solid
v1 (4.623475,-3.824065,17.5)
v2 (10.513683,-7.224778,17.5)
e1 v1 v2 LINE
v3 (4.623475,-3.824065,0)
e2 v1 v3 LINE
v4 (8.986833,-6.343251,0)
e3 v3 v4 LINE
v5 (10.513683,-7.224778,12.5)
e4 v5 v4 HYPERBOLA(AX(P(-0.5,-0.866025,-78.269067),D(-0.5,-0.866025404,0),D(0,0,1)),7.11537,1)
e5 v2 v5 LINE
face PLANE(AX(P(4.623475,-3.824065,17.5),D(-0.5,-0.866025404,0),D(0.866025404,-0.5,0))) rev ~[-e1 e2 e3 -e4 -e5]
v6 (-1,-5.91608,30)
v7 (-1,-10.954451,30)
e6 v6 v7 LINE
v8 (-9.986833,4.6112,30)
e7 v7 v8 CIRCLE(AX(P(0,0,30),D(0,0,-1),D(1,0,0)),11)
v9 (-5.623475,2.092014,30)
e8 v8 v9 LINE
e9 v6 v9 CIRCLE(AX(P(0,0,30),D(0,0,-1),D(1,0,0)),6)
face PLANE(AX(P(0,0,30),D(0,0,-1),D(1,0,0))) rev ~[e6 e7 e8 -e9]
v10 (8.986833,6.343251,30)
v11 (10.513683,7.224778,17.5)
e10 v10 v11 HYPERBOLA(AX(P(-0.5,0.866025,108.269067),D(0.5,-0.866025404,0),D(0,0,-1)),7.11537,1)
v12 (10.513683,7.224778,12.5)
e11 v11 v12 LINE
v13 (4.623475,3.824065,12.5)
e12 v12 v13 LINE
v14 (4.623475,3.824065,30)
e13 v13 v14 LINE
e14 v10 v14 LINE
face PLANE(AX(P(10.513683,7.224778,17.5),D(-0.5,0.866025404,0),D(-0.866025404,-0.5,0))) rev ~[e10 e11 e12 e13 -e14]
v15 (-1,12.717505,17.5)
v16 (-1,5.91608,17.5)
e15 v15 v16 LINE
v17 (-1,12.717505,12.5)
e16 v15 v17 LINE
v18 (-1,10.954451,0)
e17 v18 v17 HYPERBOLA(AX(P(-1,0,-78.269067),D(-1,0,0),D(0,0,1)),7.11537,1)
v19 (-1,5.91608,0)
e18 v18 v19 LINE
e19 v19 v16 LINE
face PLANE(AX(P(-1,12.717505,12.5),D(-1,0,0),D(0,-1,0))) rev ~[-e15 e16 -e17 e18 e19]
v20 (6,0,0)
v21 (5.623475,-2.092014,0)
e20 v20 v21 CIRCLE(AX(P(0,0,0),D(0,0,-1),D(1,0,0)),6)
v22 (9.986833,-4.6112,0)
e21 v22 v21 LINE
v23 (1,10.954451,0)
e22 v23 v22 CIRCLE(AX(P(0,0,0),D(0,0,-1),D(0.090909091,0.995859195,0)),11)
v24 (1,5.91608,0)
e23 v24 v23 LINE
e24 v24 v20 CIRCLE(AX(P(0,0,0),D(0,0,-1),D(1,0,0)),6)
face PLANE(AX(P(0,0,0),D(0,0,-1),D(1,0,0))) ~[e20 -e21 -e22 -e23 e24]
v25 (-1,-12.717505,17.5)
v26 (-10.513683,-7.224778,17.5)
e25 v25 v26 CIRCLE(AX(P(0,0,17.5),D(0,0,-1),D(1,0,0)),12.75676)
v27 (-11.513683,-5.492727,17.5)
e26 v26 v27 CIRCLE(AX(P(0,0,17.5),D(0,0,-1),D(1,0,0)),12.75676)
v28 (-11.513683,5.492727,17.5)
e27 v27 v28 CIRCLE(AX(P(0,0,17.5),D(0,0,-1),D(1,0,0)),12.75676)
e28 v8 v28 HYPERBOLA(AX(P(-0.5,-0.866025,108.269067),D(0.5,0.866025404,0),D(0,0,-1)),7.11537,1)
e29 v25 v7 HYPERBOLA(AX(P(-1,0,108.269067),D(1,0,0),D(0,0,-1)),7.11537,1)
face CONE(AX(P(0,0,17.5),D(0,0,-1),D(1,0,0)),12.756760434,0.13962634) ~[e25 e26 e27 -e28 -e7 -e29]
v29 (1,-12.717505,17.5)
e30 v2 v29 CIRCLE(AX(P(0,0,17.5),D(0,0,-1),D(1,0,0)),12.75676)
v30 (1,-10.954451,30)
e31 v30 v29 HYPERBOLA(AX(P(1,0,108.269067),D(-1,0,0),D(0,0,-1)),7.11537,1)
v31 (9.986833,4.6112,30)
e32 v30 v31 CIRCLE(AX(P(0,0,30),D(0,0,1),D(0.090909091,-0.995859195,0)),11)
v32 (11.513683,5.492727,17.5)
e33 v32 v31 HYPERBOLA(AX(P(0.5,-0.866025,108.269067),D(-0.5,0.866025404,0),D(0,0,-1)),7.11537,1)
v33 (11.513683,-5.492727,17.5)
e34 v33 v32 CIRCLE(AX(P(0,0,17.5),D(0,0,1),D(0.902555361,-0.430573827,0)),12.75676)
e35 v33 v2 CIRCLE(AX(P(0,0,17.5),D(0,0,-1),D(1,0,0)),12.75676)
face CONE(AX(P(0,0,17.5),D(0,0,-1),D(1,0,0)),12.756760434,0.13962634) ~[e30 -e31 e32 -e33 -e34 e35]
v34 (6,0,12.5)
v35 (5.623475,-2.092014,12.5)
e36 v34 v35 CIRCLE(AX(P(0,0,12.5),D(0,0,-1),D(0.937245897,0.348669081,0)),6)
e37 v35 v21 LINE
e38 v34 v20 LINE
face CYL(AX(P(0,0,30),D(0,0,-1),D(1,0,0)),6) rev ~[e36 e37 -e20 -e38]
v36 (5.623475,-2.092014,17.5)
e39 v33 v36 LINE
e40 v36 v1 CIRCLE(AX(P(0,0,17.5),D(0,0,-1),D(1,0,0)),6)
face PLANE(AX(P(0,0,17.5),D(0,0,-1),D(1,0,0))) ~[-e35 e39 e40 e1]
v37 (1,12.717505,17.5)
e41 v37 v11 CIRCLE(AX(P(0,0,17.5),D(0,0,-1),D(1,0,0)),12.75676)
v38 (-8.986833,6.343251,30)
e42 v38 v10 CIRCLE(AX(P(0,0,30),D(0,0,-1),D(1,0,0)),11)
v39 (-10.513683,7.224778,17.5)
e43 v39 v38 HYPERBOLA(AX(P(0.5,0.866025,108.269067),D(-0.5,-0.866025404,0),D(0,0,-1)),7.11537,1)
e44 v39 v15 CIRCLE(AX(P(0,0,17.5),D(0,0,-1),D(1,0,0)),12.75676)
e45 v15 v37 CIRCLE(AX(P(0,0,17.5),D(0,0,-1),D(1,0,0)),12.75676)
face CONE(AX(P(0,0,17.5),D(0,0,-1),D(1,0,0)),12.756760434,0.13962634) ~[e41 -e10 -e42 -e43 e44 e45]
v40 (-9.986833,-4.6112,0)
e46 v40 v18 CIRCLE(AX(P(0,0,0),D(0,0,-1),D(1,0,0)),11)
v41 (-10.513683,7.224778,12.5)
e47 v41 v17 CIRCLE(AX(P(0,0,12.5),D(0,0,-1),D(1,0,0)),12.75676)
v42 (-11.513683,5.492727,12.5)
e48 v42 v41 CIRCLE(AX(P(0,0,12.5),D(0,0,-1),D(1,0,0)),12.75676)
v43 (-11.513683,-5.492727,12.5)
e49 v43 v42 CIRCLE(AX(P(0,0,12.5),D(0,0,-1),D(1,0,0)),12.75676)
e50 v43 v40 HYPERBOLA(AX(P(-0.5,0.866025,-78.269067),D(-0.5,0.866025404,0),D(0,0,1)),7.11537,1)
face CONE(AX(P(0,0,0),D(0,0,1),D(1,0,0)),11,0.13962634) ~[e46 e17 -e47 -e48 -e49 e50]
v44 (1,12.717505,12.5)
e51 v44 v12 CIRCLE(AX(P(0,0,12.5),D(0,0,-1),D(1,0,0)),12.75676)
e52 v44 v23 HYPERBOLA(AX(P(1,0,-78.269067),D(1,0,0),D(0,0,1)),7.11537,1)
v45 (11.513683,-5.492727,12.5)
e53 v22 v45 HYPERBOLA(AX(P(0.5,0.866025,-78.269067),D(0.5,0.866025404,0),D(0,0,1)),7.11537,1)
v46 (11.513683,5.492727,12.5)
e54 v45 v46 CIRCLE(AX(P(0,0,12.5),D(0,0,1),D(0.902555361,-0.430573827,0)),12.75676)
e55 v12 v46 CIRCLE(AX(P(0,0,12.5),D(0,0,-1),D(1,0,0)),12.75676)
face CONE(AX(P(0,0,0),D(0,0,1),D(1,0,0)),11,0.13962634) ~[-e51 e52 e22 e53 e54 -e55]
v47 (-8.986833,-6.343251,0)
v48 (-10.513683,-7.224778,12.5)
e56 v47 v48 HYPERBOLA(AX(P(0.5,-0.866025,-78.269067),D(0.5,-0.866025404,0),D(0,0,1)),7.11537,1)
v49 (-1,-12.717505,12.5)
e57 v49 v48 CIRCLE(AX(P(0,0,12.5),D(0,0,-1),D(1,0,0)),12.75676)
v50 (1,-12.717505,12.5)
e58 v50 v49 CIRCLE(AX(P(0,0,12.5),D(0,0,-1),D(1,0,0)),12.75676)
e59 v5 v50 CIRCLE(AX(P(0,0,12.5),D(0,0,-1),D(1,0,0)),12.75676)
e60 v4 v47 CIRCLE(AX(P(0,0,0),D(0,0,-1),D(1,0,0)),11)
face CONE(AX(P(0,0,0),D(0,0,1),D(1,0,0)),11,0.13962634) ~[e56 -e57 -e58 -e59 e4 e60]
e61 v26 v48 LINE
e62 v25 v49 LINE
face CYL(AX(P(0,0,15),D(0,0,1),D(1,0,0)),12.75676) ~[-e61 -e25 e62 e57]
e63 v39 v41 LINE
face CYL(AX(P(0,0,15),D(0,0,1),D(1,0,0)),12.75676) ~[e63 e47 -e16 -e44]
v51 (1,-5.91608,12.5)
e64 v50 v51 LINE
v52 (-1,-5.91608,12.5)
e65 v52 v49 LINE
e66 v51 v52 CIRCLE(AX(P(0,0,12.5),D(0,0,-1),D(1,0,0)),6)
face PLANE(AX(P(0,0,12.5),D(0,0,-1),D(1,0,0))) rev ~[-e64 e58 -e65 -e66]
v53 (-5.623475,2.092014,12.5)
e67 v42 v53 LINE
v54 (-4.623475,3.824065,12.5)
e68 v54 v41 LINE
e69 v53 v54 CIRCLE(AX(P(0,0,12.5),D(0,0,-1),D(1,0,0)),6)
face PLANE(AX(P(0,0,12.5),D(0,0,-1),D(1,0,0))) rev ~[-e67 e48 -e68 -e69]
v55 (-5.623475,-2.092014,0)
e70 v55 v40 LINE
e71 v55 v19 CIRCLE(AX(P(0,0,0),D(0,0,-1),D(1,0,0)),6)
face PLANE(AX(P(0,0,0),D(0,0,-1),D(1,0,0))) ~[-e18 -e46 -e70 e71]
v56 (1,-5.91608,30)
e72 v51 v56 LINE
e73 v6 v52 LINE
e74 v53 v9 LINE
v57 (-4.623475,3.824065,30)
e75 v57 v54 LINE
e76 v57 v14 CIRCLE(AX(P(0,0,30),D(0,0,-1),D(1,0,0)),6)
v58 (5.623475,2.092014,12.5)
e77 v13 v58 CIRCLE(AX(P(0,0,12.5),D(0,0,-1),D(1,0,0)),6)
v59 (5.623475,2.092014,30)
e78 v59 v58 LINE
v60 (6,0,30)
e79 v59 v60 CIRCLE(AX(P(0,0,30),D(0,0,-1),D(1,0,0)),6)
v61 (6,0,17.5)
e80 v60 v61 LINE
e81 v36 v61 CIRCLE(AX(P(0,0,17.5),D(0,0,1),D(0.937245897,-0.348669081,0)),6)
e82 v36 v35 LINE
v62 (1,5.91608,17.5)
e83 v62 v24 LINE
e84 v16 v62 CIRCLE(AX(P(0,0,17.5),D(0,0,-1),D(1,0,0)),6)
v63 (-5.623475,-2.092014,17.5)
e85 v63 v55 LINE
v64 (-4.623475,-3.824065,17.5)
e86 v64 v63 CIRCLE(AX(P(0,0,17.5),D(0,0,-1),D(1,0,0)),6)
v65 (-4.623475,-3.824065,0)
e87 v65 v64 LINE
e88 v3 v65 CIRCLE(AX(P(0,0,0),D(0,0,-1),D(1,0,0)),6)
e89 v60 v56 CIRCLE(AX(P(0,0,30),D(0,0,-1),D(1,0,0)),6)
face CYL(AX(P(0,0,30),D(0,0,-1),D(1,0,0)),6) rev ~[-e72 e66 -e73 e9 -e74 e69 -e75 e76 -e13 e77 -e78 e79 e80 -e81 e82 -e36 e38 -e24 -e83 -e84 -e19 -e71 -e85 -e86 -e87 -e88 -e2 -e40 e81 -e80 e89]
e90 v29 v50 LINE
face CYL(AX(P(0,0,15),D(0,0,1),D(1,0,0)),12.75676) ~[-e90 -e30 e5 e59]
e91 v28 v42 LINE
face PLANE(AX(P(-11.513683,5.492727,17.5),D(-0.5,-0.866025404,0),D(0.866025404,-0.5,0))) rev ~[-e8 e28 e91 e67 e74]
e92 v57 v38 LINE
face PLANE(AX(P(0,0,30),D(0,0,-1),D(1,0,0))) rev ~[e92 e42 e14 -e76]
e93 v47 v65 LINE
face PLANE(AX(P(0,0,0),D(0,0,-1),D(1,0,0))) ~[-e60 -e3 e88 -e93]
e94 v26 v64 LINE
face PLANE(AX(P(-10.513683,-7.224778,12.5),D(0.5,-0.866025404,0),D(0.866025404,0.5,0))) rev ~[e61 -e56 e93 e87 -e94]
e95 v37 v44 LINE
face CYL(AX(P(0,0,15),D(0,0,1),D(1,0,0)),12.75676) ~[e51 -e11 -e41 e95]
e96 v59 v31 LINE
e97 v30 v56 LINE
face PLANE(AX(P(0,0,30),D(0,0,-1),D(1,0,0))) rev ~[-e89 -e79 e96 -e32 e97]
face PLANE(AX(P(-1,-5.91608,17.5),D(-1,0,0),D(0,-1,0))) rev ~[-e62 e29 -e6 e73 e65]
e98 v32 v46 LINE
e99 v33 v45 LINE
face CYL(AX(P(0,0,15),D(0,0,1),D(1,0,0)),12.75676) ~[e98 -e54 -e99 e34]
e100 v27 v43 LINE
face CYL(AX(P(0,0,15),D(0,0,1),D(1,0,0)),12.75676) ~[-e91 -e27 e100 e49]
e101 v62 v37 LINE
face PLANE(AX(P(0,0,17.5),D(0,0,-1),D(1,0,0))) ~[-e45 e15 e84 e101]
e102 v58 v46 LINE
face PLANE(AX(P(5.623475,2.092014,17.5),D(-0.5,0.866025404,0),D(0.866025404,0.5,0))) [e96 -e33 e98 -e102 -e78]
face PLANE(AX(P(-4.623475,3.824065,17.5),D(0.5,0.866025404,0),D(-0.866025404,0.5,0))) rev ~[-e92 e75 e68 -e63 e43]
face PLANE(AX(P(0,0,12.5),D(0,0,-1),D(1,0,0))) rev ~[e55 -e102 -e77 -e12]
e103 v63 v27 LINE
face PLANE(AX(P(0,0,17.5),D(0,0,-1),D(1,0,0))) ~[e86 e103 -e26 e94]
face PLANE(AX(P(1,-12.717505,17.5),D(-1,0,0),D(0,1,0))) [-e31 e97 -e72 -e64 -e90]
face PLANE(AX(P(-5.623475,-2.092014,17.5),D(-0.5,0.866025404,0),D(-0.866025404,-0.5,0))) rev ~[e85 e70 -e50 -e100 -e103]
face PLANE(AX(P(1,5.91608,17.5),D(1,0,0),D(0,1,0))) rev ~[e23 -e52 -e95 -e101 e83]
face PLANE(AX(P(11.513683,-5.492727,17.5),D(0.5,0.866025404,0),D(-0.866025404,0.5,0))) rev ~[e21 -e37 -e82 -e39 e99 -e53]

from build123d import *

# Parameters (mm, degrees)
F0_W     = 6.7567604338
F0_H     = 5
F3_DEPTH = 5
F6_DEPTH = 25
F7_DEPTH = 25


# Not quite as in the source:
# - a feature names something its author has since deleted; it is built from what else it names


with BuildPart() as f1:
    # F0 (on Front) → F1 (revolve)
    with BuildSketch(Plane.XZ):
        with Locations((9.3783802169, 15)):
            Rectangle(F0_W, F0_H)
    revolve(axis=Axis((0, 0, -3.2319817692), (0, 0, -1)))

    # F2 (on face) → F3 (cut, through all)
    with BuildSketch(Plane.XY.offset(17.5)):
        with BuildLine():
            ThreePointArc((1, 12.7175051313), (0, 12.7567604338), (-1, 12.7175051313))
            Line((-1, 12.7175051313), (-1, 5.9160797831))
            ThreePointArc((-1, 5.9160797831), (0, 6), (1, 5.9160797831))
            Line((1, 5.9160797831), (1, 12.7175051313))
        make_face()
        with BuildLine():
            Line((-4.623475383, 3.8240652953), (-10.5136825165, 7.2247779694))
            ThreePointArc((-10.5136825165, 7.2247779694), (-11.0476786056, 6.3783802169), (-11.5136825165, 5.4927271619))
            Line((-11.5136825165, 5.4927271619), (-5.623475383, 2.0920144878))
            ThreePointArc((-5.623475383, 2.0920144878), (-5.1961524227, 3), (-4.623475383, 3.8240652953))
        make_face()
        with BuildLine():
            Line((-5.623475383, -2.0920144878), (-11.5136825165, -5.4927271619))
            ThreePointArc((-11.5136825165, -5.4927271619), (-11.0476786056, -6.3783802169), (-10.5136825165, -7.2247779694))
            Line((-10.5136825165, -7.2247779694), (-4.623475383, -3.8240652953))
            ThreePointArc((-4.623475383, -3.8240652953), (-5.1961524227, -3), (-5.623475383, -2.0920144878))
        make_face()
        with BuildLine():
            Line((-1, -5.9160797831), (-1, -12.7175051313))
            ThreePointArc((-1, -12.7175051313), (0, -12.7567604338), (1, -12.7175051313))
            Line((1, -12.7175051313), (1, -5.9160797831))
            ThreePointArc((1, -5.9160797831), (0, -6), (-1, -5.9160797831))
        make_face()
        with BuildLine():
            ThreePointArc((10.5136825165, -7.2247779694), (11.0476786056, -6.3783802169), (11.5136825165, -5.4927271619))
            Line((11.5136825165, -5.4927271619), (5.623475383, -2.0920144878))
            ThreePointArc((5.623475383, -2.0920144878), (5.1961524227, -3), (4.623475383, -3.8240652953))
            Line((4.623475383, -3.8240652953), (10.5136825165, -7.2247779694))
        make_face()
        with BuildLine():
            ThreePointArc((11.5136825165, 5.4927271619), (11.0476786056, 6.3783802169), (10.5136825165, 7.2247779694))
            Line((10.5136825165, 7.2247779694), (4.623475383, 3.8240652953))
            ThreePointArc((4.623475383, 3.8240652953), (5.1961524227, 3), (5.623475383, 2.0920144878))
            Line((5.623475383, 2.0920144878), (11.5136825165, 5.4927271619))
        make_face()
    extrude(amount=-F3_DEPTH, mode=Mode.SUBTRACT)


with BuildPart() as f4:
    # F0 (on Front) → F4 (revolve)
    with BuildSketch(Plane.XZ):
        Polygon((6, 30), (6, 17.5), (12.7567604338, 17.5), (11, 30), align=None)
    revolve(axis=Axis((0, 0, -3.2319817692), (0, 0, -1)))


with BuildPart() as f4b:
    # F0 (on Front) → F4, piece 2 (revolve)
    with BuildSketch(Plane.XZ):
        Polygon((6, 12.5), (6, 0), (11, 0), (12.7567604338, 12.5), align=None)
    revolve(axis=Axis((0, 0, -3.2319817692), (0, 0, -1)))


with BuildPart() as f1_1:
    add(f1.part)

    # F5: union F4b, F4
    add(f4b.part)
    add(f4.part)

    # F6 (cut): faces of the model
    f6_faces = [f1_1.faces().sort_by_distance(p)[0] for p in [
        (0, -9.3578583369, 17.5),
        (8.1041430447, 4.6789291684, 17.5),
        (-8.1041430447, 4.6789291684, 17.5),
    ]]
    extrude(f6_faces, amount=-F6_DEPTH, mode=Mode.SUBTRACT)

    # F7 (cut): faces of the model
    f7_faces = [f1_1.faces().sort_by_distance(p)[0] for p in [
        (8.1041430447, -4.6789291684, 12.5),
        (0, 9.3578583369, 12.5),
        (-8.1041430447, -4.6789291684, 12.5),
    ]]
    extrude(f7_faces, amount=-F7_DEPTH, mode=Mode.SUBTRACT)


solid = f1_1.part
